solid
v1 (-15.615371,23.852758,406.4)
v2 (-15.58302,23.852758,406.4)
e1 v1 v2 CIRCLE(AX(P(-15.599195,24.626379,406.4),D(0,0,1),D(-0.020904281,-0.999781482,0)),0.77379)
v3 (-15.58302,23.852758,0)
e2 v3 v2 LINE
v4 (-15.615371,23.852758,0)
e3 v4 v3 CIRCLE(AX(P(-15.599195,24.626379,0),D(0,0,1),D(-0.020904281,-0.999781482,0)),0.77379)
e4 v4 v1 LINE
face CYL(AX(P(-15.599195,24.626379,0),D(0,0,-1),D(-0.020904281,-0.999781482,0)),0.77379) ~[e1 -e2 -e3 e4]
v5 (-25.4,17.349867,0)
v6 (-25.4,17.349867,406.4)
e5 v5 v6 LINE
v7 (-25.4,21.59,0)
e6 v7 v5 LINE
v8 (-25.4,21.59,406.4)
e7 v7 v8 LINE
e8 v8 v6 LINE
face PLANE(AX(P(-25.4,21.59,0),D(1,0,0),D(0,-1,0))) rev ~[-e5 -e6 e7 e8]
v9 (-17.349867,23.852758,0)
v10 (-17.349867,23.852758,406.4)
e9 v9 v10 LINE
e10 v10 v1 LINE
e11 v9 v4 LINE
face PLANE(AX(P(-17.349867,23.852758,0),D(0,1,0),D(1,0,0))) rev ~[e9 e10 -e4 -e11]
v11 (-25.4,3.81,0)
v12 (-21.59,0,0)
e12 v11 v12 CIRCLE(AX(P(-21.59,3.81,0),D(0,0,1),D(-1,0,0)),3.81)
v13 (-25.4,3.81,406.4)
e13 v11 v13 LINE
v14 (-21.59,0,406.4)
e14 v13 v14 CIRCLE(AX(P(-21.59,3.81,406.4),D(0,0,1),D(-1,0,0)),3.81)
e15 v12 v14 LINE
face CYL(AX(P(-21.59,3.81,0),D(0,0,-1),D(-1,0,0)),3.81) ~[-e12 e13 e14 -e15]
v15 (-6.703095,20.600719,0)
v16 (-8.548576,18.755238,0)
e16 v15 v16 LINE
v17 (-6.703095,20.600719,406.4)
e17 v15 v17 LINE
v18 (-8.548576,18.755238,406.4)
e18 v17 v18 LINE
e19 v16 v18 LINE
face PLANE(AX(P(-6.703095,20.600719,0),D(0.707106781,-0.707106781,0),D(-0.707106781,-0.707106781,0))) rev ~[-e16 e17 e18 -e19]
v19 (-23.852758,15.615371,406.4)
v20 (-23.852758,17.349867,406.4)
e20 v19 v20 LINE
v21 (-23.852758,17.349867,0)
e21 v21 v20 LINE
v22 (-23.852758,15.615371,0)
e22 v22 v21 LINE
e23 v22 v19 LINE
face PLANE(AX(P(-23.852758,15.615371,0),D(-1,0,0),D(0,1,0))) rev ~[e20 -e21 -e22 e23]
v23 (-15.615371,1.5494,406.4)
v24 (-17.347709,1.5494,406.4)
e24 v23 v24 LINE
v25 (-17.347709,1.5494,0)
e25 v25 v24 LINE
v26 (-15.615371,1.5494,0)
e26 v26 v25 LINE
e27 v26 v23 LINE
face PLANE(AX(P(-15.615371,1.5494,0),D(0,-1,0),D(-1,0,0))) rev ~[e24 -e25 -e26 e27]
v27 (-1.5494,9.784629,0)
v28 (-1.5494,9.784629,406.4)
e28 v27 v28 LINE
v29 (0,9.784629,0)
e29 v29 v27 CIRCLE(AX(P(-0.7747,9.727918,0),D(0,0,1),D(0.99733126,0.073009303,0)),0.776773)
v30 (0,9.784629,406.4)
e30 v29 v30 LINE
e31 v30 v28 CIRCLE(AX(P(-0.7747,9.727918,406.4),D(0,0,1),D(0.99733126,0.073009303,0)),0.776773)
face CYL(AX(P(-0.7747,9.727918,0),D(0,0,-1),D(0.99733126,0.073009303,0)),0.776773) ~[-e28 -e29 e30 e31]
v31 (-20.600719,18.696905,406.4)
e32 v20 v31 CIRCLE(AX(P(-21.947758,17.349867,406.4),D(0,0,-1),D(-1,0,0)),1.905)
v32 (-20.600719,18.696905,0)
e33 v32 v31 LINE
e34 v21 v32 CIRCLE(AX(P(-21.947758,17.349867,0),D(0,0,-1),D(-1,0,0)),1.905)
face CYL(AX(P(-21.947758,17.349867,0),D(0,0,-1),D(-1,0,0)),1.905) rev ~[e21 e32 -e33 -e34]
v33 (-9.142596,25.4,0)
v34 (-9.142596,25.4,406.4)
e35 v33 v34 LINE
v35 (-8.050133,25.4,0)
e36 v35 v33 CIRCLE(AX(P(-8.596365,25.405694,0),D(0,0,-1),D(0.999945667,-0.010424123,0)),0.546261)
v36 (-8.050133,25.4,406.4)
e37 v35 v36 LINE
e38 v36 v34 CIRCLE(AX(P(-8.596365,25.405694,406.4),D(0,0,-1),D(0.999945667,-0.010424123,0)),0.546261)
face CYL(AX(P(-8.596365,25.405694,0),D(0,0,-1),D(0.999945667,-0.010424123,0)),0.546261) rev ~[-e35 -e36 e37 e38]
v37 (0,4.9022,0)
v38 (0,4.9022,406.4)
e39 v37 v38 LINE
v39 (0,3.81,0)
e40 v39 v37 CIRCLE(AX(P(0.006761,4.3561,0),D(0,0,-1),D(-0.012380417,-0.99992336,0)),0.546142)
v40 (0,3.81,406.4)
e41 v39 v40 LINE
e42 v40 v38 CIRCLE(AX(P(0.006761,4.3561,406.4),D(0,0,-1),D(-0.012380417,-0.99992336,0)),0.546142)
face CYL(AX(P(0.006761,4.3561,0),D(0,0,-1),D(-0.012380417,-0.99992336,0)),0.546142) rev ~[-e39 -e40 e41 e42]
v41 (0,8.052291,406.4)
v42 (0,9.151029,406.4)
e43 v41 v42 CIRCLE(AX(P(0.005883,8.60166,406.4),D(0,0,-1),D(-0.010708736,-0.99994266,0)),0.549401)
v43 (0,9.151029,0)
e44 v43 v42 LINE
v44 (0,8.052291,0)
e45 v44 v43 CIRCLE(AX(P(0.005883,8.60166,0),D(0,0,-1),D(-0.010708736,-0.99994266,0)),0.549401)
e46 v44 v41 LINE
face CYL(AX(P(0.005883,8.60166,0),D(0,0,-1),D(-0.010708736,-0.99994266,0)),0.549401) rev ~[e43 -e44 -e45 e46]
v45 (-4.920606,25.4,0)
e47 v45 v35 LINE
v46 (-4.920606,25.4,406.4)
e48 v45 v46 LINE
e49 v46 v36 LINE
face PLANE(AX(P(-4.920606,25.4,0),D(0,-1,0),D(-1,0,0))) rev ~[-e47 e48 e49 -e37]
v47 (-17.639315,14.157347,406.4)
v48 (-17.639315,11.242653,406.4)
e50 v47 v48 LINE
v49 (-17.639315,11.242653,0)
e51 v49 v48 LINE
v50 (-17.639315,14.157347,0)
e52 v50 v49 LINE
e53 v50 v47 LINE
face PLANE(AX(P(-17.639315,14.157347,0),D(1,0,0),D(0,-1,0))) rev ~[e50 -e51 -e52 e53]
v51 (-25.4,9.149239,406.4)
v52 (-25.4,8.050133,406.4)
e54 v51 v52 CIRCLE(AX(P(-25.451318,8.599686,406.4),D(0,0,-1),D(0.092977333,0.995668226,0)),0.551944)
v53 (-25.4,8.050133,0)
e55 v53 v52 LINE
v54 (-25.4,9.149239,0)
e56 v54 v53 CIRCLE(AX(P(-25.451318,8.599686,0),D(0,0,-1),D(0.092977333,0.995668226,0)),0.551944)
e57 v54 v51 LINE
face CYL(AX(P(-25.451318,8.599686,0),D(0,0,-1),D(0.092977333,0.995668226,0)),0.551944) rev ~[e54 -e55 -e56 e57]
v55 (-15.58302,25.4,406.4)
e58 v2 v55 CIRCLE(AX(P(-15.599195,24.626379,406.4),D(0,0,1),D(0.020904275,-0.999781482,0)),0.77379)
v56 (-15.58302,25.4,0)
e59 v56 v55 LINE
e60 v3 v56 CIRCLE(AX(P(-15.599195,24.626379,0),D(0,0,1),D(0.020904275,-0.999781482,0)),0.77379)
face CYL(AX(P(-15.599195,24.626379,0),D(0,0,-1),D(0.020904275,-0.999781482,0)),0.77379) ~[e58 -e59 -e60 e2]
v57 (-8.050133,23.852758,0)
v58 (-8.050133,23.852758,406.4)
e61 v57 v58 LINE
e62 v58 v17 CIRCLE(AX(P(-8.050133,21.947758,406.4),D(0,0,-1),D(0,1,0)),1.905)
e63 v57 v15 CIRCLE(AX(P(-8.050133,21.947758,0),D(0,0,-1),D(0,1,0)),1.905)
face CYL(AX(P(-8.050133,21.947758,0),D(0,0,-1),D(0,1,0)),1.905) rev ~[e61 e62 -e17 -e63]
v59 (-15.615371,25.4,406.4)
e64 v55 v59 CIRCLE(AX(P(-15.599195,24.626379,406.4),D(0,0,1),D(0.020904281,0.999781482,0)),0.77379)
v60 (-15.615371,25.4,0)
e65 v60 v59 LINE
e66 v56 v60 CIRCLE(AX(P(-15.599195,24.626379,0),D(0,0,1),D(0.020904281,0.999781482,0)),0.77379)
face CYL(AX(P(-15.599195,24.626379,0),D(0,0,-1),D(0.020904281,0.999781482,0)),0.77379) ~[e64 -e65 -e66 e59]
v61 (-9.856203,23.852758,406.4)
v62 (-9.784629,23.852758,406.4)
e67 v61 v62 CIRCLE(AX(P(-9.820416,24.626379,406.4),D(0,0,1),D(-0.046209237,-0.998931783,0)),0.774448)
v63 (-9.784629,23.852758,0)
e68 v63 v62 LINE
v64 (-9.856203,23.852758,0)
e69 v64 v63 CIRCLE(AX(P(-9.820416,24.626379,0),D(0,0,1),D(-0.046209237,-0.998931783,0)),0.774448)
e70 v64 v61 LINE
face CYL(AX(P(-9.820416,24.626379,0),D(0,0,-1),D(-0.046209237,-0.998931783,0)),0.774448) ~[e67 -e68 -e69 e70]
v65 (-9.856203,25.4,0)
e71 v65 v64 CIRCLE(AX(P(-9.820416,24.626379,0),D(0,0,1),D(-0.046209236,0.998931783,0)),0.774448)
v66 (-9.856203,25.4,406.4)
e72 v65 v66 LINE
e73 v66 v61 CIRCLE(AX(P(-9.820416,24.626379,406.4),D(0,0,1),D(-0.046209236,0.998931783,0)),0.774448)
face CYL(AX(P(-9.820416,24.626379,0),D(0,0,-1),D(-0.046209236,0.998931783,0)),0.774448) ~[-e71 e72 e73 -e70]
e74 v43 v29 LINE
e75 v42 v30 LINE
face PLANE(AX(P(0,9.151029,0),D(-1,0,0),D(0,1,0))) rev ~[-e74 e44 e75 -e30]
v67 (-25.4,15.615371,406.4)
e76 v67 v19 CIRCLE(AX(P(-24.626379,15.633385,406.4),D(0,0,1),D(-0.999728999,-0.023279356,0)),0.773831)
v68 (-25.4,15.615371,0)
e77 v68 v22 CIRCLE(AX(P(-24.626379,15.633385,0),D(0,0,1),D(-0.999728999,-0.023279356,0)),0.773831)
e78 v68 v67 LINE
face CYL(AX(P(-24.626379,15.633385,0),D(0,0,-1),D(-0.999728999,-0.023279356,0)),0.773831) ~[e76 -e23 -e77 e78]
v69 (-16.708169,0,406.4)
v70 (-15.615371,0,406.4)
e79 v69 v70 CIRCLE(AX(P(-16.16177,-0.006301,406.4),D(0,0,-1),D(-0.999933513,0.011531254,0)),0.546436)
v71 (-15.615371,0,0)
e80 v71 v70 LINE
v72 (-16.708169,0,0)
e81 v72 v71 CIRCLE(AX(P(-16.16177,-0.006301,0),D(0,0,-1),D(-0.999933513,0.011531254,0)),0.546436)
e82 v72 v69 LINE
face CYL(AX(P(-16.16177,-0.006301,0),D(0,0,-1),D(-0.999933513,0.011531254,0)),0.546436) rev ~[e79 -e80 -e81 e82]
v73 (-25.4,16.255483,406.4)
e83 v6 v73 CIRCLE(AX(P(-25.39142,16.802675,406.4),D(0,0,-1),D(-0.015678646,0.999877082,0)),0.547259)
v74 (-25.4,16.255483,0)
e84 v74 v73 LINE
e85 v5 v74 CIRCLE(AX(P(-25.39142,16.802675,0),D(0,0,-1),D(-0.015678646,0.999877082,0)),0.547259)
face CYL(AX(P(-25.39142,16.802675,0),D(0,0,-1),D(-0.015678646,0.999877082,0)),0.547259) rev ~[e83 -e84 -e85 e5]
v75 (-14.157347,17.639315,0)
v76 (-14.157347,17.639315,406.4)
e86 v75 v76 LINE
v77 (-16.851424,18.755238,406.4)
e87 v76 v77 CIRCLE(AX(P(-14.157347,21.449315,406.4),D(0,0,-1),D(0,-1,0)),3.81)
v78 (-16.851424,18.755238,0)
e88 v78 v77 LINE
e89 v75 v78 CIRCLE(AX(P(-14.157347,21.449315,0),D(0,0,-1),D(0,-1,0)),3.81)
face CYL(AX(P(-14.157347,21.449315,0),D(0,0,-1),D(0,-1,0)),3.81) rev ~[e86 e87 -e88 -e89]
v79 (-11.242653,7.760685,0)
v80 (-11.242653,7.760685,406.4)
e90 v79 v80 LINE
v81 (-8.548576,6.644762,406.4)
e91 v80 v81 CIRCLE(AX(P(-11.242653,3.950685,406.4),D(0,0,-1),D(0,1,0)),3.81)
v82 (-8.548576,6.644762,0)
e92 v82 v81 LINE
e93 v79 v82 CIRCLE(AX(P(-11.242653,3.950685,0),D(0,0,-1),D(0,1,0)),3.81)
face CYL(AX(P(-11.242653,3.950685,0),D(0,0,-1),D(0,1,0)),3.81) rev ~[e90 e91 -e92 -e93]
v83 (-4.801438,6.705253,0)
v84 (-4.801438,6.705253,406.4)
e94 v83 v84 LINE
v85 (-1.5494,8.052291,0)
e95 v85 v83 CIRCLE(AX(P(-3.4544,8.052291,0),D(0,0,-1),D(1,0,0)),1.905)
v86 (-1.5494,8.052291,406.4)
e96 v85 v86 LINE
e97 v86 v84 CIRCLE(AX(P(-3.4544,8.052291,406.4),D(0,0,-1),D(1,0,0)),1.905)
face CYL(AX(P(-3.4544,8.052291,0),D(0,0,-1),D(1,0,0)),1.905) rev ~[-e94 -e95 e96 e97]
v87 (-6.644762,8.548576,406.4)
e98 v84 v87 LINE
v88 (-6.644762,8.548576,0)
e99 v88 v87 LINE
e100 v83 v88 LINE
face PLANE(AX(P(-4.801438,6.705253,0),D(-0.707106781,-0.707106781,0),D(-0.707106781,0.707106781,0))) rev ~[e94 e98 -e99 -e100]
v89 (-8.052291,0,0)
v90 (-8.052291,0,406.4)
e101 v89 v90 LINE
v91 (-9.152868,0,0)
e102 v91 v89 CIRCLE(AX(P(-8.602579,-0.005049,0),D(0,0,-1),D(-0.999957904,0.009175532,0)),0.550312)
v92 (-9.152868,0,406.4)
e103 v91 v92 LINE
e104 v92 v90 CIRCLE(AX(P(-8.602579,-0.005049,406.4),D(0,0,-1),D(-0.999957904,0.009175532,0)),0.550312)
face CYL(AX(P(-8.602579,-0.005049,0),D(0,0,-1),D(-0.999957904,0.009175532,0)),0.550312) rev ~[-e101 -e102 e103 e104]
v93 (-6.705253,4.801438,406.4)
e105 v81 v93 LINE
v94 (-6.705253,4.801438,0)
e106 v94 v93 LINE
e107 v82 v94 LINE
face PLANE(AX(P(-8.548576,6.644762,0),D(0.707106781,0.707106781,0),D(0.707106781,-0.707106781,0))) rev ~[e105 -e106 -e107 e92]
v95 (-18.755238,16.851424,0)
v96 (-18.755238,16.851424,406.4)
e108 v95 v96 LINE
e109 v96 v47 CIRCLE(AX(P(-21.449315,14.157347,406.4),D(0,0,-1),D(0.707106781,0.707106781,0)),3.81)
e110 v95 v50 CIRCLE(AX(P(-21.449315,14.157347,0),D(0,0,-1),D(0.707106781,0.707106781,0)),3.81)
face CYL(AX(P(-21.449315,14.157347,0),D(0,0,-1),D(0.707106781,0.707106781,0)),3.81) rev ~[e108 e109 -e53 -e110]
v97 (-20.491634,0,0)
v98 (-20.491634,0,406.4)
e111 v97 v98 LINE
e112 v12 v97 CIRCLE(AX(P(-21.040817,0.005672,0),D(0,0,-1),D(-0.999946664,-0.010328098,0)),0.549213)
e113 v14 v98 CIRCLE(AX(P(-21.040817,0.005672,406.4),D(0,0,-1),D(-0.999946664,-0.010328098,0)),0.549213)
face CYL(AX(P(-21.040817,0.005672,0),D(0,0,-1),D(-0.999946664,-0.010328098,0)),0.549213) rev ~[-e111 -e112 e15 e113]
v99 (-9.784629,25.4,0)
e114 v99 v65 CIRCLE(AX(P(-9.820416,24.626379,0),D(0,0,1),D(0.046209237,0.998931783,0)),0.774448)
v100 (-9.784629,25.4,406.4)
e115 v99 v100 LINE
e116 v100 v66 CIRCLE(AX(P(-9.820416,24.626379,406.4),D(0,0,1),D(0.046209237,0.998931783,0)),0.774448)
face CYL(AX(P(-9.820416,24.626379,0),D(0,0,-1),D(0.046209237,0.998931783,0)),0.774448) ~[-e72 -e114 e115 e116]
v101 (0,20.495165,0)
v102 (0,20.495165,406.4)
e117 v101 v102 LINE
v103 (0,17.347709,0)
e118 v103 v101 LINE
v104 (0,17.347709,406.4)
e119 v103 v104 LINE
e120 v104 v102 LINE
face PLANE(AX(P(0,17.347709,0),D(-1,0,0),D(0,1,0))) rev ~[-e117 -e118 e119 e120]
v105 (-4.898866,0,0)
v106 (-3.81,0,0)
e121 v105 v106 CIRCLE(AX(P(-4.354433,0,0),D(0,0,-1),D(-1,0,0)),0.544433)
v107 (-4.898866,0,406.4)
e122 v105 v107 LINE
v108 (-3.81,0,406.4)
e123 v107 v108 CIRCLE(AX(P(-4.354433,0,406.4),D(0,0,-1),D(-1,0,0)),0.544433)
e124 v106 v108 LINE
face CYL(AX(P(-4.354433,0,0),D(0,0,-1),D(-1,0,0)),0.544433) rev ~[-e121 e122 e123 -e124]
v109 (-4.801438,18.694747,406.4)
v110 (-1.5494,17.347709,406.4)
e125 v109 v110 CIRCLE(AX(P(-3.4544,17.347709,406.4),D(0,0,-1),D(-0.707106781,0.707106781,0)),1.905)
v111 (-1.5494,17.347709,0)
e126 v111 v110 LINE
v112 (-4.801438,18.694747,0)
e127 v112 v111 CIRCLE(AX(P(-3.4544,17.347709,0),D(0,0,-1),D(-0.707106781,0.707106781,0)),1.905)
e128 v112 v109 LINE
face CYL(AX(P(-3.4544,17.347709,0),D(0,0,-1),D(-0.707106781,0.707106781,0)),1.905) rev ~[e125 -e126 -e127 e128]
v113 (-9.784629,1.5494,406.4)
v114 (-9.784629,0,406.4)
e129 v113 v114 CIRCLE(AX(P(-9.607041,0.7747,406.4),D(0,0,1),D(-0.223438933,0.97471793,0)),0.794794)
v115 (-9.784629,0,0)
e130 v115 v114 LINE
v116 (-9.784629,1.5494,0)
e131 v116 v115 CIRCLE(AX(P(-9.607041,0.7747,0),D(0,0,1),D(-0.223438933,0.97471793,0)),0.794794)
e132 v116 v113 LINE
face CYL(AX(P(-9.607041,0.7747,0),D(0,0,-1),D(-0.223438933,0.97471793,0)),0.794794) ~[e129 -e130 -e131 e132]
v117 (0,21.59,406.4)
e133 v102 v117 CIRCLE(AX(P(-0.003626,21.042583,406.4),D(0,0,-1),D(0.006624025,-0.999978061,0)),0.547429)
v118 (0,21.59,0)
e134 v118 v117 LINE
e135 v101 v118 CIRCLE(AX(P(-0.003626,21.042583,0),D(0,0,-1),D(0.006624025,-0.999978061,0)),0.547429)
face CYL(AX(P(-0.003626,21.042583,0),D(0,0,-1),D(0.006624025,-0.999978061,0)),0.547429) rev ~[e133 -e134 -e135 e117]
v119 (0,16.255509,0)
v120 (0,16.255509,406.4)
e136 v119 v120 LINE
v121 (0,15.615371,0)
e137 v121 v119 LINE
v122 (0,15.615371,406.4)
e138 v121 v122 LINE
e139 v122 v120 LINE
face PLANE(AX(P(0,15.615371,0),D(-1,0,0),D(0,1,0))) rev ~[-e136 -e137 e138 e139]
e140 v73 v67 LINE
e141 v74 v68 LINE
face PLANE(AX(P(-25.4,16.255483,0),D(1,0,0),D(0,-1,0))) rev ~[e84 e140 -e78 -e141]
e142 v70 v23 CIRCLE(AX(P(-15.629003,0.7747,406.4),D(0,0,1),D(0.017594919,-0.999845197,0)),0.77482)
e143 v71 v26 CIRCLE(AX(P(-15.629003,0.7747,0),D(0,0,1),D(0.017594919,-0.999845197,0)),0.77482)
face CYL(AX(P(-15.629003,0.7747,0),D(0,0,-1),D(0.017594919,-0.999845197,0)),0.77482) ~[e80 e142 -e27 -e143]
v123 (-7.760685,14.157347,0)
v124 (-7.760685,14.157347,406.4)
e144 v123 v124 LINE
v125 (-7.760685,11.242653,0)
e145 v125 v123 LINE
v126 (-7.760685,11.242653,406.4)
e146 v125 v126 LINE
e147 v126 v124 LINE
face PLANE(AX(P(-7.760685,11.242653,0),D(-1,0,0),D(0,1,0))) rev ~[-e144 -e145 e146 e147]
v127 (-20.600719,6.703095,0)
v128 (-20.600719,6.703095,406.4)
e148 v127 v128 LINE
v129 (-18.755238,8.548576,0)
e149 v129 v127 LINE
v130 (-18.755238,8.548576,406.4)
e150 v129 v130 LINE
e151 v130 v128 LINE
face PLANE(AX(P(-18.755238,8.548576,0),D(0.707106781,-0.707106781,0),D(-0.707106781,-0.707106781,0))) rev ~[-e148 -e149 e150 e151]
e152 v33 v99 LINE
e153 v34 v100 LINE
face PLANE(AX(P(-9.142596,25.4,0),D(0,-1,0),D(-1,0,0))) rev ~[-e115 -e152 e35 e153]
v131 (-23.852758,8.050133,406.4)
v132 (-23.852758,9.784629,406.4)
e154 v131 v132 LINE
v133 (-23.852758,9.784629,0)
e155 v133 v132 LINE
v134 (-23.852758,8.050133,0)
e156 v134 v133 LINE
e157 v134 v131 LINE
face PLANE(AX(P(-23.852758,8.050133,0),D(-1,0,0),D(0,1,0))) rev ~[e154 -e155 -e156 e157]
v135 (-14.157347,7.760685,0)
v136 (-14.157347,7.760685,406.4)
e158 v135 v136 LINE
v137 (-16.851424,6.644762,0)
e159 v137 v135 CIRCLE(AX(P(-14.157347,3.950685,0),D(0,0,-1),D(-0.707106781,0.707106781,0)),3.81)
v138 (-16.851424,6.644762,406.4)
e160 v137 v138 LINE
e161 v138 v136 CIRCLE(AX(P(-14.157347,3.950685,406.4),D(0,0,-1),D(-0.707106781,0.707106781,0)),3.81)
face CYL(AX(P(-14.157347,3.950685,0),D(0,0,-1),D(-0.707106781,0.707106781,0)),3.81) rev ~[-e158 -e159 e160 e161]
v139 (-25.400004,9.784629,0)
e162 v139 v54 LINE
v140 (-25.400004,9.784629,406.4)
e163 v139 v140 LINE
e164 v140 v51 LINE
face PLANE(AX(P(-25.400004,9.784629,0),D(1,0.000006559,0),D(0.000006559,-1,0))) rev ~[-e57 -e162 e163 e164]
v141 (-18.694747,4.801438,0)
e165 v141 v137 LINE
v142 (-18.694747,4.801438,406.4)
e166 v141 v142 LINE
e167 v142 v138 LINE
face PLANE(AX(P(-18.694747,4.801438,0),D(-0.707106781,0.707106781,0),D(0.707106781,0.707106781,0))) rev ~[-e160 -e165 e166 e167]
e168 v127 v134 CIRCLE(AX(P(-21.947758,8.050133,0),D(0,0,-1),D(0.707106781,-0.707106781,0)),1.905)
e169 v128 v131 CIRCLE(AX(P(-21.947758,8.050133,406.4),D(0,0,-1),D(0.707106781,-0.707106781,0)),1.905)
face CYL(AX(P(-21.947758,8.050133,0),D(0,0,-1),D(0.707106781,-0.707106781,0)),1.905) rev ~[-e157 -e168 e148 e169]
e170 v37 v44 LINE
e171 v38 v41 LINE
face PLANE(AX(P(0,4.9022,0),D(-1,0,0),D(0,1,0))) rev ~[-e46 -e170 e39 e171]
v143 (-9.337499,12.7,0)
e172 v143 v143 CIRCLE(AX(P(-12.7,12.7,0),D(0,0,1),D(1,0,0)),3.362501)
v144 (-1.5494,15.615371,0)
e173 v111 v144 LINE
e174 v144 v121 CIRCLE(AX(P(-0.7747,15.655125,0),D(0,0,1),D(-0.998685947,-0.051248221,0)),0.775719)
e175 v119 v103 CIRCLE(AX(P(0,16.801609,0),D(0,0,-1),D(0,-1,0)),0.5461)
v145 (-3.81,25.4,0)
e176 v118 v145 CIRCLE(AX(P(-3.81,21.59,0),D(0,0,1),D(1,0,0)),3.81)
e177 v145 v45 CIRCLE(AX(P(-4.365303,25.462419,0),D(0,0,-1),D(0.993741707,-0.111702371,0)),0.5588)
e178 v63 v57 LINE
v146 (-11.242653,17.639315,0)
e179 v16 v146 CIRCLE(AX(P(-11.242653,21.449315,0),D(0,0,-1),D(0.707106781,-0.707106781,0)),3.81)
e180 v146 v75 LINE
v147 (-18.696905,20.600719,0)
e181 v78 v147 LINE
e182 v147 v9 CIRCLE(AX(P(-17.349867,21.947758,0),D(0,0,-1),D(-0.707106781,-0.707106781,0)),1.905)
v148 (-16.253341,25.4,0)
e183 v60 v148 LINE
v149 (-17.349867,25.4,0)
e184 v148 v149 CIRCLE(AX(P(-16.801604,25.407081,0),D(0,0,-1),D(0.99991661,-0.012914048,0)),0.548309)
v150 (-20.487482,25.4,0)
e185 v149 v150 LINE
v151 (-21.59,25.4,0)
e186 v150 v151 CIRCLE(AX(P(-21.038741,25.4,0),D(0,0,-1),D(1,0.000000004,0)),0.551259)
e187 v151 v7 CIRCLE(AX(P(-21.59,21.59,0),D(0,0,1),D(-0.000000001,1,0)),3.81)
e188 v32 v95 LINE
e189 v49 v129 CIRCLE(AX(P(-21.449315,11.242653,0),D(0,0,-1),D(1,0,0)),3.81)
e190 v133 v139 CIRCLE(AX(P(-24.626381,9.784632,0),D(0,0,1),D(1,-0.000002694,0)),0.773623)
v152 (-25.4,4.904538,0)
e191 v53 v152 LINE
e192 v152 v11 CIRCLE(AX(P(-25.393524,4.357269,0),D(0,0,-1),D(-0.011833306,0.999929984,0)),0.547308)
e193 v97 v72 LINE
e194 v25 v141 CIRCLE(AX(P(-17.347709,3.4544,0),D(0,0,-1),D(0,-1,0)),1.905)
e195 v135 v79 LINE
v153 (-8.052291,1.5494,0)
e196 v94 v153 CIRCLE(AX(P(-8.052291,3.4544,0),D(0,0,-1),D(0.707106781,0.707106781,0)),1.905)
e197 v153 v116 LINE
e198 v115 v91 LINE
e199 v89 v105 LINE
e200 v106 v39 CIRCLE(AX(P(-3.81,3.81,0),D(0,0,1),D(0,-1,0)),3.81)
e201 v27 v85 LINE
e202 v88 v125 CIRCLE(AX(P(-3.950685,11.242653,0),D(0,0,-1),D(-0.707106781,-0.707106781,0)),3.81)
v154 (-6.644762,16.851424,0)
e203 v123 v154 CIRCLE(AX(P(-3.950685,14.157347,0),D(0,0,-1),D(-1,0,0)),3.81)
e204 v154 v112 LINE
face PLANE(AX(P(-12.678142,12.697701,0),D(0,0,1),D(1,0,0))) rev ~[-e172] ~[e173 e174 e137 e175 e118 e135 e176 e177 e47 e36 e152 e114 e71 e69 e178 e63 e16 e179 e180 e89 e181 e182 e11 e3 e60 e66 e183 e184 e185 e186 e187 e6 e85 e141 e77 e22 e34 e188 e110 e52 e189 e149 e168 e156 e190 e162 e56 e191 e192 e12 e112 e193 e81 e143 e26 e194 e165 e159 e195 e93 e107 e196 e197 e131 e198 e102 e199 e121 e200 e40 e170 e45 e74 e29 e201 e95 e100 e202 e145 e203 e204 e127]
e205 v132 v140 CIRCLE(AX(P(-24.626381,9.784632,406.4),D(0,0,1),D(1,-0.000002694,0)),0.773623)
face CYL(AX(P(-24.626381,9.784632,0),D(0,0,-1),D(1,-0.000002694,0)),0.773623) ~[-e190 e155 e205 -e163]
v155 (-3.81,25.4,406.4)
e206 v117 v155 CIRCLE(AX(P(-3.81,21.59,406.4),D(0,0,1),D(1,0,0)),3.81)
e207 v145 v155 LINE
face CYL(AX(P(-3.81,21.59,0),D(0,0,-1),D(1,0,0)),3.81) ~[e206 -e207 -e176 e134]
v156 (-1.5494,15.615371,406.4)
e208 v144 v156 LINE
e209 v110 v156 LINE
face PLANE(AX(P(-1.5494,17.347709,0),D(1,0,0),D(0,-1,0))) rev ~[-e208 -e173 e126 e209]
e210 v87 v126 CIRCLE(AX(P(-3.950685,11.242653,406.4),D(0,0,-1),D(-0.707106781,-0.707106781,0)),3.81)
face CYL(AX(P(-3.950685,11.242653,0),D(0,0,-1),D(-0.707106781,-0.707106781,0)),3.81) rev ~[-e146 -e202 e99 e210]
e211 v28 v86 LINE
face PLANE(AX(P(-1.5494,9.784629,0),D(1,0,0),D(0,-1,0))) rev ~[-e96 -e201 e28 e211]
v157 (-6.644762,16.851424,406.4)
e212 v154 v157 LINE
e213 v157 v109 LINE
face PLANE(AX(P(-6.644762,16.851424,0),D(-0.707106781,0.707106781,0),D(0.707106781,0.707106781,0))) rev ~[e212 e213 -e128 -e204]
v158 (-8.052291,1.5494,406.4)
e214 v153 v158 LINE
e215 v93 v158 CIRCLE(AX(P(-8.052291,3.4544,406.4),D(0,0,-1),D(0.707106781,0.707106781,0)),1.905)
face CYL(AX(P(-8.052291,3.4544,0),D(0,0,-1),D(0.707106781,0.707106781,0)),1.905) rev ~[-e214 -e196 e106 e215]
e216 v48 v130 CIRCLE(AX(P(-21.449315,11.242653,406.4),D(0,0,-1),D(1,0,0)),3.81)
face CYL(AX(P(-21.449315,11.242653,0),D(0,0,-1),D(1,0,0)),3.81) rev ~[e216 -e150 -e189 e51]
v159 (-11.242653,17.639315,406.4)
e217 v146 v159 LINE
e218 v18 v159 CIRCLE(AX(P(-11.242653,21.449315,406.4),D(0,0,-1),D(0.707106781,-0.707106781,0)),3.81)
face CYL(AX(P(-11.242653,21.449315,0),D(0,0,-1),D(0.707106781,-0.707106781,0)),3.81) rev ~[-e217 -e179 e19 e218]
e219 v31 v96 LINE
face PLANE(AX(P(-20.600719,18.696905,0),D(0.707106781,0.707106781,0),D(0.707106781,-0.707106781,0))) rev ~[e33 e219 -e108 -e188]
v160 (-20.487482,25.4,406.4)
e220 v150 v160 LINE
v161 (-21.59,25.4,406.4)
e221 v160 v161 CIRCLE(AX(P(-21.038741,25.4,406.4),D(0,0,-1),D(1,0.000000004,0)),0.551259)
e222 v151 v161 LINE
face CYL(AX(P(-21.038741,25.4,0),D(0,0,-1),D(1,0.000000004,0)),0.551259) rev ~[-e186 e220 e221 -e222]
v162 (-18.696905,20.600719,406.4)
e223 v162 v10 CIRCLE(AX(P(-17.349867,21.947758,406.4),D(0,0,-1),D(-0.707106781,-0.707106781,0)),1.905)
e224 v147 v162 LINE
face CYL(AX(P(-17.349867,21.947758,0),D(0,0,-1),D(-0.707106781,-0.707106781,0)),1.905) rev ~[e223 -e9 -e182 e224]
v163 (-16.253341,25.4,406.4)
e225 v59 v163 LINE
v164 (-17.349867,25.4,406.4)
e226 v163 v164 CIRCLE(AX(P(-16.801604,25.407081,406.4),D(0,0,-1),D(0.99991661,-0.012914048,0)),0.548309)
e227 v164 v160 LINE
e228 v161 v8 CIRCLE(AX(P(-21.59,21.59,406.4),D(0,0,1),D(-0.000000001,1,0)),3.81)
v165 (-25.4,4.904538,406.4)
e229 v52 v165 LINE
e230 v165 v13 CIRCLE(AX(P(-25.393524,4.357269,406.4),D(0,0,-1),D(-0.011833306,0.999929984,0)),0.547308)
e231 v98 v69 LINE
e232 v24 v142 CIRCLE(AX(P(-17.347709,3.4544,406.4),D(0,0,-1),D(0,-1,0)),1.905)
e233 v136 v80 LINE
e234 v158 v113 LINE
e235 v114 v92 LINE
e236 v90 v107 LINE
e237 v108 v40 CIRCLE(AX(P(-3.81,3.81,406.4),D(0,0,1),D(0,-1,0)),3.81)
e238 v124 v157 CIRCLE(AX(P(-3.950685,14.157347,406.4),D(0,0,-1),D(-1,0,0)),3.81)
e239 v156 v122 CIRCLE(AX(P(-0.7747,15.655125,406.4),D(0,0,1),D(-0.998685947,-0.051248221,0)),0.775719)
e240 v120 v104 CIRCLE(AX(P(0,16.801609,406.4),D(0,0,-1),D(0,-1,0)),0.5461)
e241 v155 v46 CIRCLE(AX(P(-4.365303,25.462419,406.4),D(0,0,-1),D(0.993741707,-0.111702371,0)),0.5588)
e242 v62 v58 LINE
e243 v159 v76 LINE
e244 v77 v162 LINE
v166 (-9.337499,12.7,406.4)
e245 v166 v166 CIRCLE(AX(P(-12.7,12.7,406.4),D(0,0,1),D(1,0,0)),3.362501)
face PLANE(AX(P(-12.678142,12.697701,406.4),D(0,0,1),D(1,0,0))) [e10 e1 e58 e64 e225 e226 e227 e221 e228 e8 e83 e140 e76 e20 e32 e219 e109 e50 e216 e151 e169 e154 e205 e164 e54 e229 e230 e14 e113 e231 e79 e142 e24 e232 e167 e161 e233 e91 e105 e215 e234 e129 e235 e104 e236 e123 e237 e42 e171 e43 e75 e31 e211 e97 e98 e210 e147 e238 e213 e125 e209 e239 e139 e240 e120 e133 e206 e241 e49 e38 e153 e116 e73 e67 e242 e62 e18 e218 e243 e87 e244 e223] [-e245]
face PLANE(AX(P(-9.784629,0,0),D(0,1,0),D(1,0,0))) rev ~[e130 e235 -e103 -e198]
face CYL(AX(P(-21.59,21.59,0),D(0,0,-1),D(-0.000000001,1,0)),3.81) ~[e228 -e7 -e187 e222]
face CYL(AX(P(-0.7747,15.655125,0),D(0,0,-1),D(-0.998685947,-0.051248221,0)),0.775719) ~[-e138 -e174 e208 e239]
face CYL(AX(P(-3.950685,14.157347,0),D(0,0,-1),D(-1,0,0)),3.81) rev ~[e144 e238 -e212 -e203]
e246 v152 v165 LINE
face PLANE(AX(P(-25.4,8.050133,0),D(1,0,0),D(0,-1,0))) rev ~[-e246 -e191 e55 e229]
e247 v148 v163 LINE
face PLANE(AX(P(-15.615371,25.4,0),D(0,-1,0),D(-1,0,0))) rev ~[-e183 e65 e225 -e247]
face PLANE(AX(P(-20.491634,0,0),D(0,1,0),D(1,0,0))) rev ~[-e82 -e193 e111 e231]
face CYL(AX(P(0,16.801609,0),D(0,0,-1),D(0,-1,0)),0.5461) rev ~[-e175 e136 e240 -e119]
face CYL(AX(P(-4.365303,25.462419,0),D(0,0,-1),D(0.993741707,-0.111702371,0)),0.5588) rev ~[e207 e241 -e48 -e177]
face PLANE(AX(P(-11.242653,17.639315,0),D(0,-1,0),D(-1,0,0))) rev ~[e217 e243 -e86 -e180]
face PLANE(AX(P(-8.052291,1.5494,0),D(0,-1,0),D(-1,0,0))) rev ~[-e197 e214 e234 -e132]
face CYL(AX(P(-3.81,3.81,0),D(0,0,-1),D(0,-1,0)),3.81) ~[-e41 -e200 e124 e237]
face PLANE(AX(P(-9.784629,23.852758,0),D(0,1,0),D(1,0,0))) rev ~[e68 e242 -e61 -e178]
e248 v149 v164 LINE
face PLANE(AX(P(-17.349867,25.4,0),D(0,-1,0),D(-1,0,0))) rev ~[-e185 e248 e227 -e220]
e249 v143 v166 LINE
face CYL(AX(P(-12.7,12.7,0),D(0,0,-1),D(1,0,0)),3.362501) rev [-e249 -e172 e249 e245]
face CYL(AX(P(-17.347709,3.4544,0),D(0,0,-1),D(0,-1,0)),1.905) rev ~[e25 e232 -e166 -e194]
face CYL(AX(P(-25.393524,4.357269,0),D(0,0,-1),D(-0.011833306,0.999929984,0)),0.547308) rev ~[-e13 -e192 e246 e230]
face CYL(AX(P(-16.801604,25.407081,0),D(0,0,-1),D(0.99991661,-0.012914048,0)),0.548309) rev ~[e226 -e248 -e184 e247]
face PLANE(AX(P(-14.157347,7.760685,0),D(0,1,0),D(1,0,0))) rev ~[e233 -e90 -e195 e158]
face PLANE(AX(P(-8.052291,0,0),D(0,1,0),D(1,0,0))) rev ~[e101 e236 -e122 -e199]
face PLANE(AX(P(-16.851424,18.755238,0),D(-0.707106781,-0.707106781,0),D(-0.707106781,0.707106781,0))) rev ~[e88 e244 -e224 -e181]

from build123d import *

# Parameters (mm, degrees)
F0_R     = 3.3625011168
F1_DEPTH = 406.4


# Not quite as in the source:
# - ends of sketch curves that miss each other by under 0.0002 mm in the source are joined


with BuildPart() as f1:
    # F0 (on Top) → F1 (new body)
    with BuildSketch(Plane.XY):
        with BuildLine():
            ThreePointArc((-8.5485764575, 18.7552378401), (-9.7846294165, 17.9293336576), (-11.2426532939, 17.6393146764))
            Line((-11.2426532939, 17.6393146764), (-14.1573467061, 17.6393146764))
            ThreePointArc((-14.1573467061, 17.6393146764), (-15.6153705835, 17.9293336576), (-16.8514235425, 18.7552378401))
            Line((-16.8514235425, 18.7552378401), (-18.696905198, 20.6007194956))
            ThreePointArc((-18.696905198, 20.6007194956), (-19.1098572893, 22.6767698525), (-17.3498667798, 23.8527579138))
            Line((-17.3498667798, 23.8527579138), (-15.6153705835, 23.8527579138))
            Line((-15.6153705835, 23.8527579138), (-15.5830195394, 23.8527579138))
            ThreePointArc((-15.5830195394, 23.8527579138), (-14.8254049311, 24.6263789569), (-15.5830195394, 25.4))
            Line((-15.5830195394, 25.4), (-15.6153705835, 25.4))
            Line((-15.6153705835, 25.4), (-16.2533409894, 25.4))
            ThreePointArc((-16.2533409894, 25.4), (-16.8016038846, 24.8587722652), (-17.3498667798, 25.4))
            Line((-17.3498667798, 25.4), (-20.4874817282, 25.4))
            ThreePointArc((-20.4874817282, 25.4), (-21.0387408641, 24.8487408595), (-21.5900000046, 25.4))
            ThreePointArc((-21.5900000046, 25.4), (-24.2840768363, 24.2840768363), (-25.4, 21.59))
            Line((-25.4, 21.59), (-25.4, 20.5047242343))
            Line((-25.4, 20.5047242343), (-25.4, 17.3498667798))
            ThreePointArc((-25.4, 17.3498667798), (-24.8441605755, 16.8026749055), (-25.4, 16.2554830313))
            Line((-25.4, 16.2554830313), (-25.4, 15.6153705835))
            ThreePointArc((-25.4, 15.6153705835), (-24.6263789569, 14.8595541131), (-23.8527579138, 15.6153705835))
            Line((-23.8527579138, 15.6153705835), (-23.8527579138, 17.3498667798))
            ThreePointArc((-23.8527579138, 17.3498667798), (-22.6767698525, 19.1098572893), (-20.6007194956, 18.696905198))
            Line((-20.6007194956, 18.696905198), (-18.7552378401, 16.8514235425))
            ThreePointArc((-18.7552378401, 16.8514235425), (-17.9293336576, 15.6153705835), (-17.6393146764, 14.1573467061))
            Line((-17.6393146764, 14.1573467061), (-17.6393146764, 11.2426532939))
            ThreePointArc((-17.6393146764, 11.2426532939), (-17.9293336576, 9.7846294165), (-18.7552378401, 8.5485764575))
            Line((-18.7552378401, 8.5485764575), (-20.6007194956, 6.703094802))
            ThreePointArc((-20.6007194956, 6.703094802), (-22.6767698525, 6.2901427107), (-23.8527579138, 8.0501332202))
            Line((-23.8527579138, 8.0501332202), (-23.8527579138, 9.7846294165))
            ThreePointArc((-23.8527579138, 9.7846294165), (-24.6263789569, 10.5582546272), (-25.4000041675, 9.7846294165))
            Line((-25.4000041675, 9.7846294165), (-25.4, 9.1492393985))
            ThreePointArc((-25.4, 9.1492393985), (-24.8993742936, 8.5996863094), (-25.4, 8.0501332202))
            Line((-25.4, 8.0501332202), (-25.4, 4.904538393))
            ThreePointArc((-25.4, 4.904538393), (-24.8462160257, 4.3572691965), (-25.4, 3.81))
            ThreePointArc((-25.4, 3.81), (-24.2840768363, 1.1159231637), (-21.59, 0))
            ThreePointArc((-21.59, 0), (-21.0408167821, 0.5548848314), (-20.4916335642, 0))
            Line((-20.4916335642, 0), (-16.7081691325, 0))
            ThreePointArc((-16.7081691325, 0), (-16.161769858, 0.5401345174), (-15.6153705835, 0))
            ThreePointArc((-15.6153705835, 0), (-14.8541835334, 0.7747), (-15.6153705835, 1.5494))
            Line((-15.6153705835, 1.5494), (-17.347708866, 1.5494))
            ThreePointArc((-17.347708866, 1.5494), (-19.1076993754, 2.7253880613), (-18.6947472842, 4.8014384182))
            Line((-18.6947472842, 4.8014384182), (-16.8514235425, 6.6447621599))
            ThreePointArc((-16.8514235425, 6.6447621599), (-15.6153705835, 7.4706663424), (-14.1573467061, 7.7606853236))
            Line((-14.1573467061, 7.7606853236), (-11.2426532939, 7.7606853236))
            ThreePointArc((-11.2426532939, 7.7606853236), (-9.7846294165, 7.4706663424), (-8.5485764575, 6.6447621599))
            Line((-8.5485764575, 6.6447621599), (-6.7052527158, 4.8014384182))
            ThreePointArc((-6.7052527158, 4.8014384182), (-6.2923006246, 2.7253880613), (-8.052291134, 1.5494))
            Line((-8.052291134, 1.5494), (-9.7846294165, 1.5494))
            ThreePointArc((-9.7846294165, 1.5494), (-10.4018355229, 0.7747), (-9.7846294165, 0))
            Line((-9.7846294165, 0), (-9.1528678313, 0))
            ThreePointArc((-9.1528678313, 0), (-8.6025794826, 0.5452621138), (-8.052291134, 0))
            Line((-8.052291134, 0), (-4.8988661729, 0))
            ThreePointArc((-4.8988661729, 0), (-4.3544330864, 0.5444330864), (-3.81, 0))
            ThreePointArc((-3.81, 0), (-1.1159231637, 1.1159231637), (0, 3.81))
            ThreePointArc((0, 3.81), (-0.5393803924, 4.3561), (0, 4.9022))
            Line((0, 4.9022), (0, 8.052291134))
            ThreePointArc((0, 8.052291134), (-0.5435172497, 8.6016602673), (0, 9.1510294005))
            Line((0, 9.1510294005), (0, 9.7846294165))
            ThreePointArc((0, 9.7846294165), (-0.7747, 10.5046907664), (-1.5494, 9.7846294165))
            Line((-1.5494, 9.7846294165), (-1.5494, 8.052291134))
            ThreePointArc((-1.5494, 8.052291134), (-2.7253880613, 6.2923006246), (-4.8014384182, 6.7052527158))
            Line((-4.8014384182, 6.7052527158), (-6.6447621599, 8.5485764575))
            ThreePointArc((-6.6447621599, 8.5485764575), (-7.4706663424, 9.7846294165), (-7.7606853236, 11.2426532939))
            Line((-7.7606853236, 11.2426532939), (-7.7606853236, 14.1573467061))
            ThreePointArc((-7.7606853236, 14.1573467061), (-7.4706663424, 15.6153705835), (-6.6447621599, 16.8514235425))
            Line((-6.6447621599, 16.8514235425), (-4.8014384182, 18.6947472842))
            ThreePointArc((-4.8014384182, 18.6947472842), (-2.7253880613, 19.1076993754), (-1.5494, 17.347708866))
            Line((-1.5494, 17.347708866), (-1.5494, 15.6153705835))
            ThreePointArc((-1.5494, 15.6153705835), (-0.7747, 14.8794054827), (0, 15.6153705835))
            Line((0, 15.6153705835), (0, 16.255508866))
            ThreePointArc((0, 16.255508866), (-0.5461, 16.801608866), (0, 17.347708866))
            Line((0, 17.347708866), (0, 20.4951651394))
            ThreePointArc((0, 20.4951651394), (-0.5510556267, 21.0425825697), (0, 21.59))
            ThreePointArc((0, 21.59), (-1.1159231637, 24.2840768363), (-3.81, 25.4))
            ThreePointArc((-3.81, 25.4), (-4.3653028659, 24.9036192847), (-4.9206057318, 25.4))
            Line((-4.9206057318, 25.4), (-8.0501332202, 25.4))
            ThreePointArc((-8.0501332202, 25.4), (-8.5963647474, 24.8594330871), (-9.1425962746, 25.4))
            Line((-9.1425962746, 25.4), (-9.7846294165, 25.4))
            Line((-9.7846294165, 25.4), (-9.856202747, 25.4))
            ThreePointArc((-9.856202747, 25.4), (-10.594864404, 24.6263789569), (-9.856202747, 23.8527579138))
            Line((-9.856202747, 23.8527579138), (-9.7846294165, 23.8527579138))
            Line((-9.7846294165, 23.8527579138), (-8.0501332202, 23.8527579138))
            ThreePointArc((-8.0501332202, 23.8527579138), (-6.2901427107, 22.6767698525), (-6.703094802, 20.6007194956))
            Line((-6.703094802, 20.6007194956), (-8.5485764575, 18.7552378401))
        make_face()
        with Locations((-12.7, 12.7)):
            Circle(F0_R, mode=Mode.SUBTRACT)
        with BuildLine():
            ThreePointArc((-9.856202747, 23.8527579138), (-9.8204160818, 23.8519306347), (-9.7846294165, 23.8527579138))
            Line((-9.7846294165, 23.8527579138), (-9.856202747, 23.8527579138))
        make_face()
        with BuildLine():
            Line((-15.5830195394, 23.8527579138), (-15.6153705835, 23.8527579138))
            ThreePointArc((-15.6153705835, 23.8527579138), (-15.5991950614, 23.8525888265), (-15.5830195394, 23.8527579138))
        make_face()
        with BuildLine():
            ThreePointArc((-9.7846294165, 25.4), (-9.8204160818, 25.4008272791), (-9.856202747, 25.4))
            Line((-9.856202747, 25.4), (-9.7846294165, 25.4))
        make_face()
        with BuildLine():
            Line((-15.6153705835, 25.4), (-15.5830195394, 25.4))
            ThreePointArc((-15.5830195394, 25.4), (-15.5991950614, 25.4001690873), (-15.6153705835, 25.4))
        make_face()
    extrude(amount=F1_DEPTH)


solid = f1.part
